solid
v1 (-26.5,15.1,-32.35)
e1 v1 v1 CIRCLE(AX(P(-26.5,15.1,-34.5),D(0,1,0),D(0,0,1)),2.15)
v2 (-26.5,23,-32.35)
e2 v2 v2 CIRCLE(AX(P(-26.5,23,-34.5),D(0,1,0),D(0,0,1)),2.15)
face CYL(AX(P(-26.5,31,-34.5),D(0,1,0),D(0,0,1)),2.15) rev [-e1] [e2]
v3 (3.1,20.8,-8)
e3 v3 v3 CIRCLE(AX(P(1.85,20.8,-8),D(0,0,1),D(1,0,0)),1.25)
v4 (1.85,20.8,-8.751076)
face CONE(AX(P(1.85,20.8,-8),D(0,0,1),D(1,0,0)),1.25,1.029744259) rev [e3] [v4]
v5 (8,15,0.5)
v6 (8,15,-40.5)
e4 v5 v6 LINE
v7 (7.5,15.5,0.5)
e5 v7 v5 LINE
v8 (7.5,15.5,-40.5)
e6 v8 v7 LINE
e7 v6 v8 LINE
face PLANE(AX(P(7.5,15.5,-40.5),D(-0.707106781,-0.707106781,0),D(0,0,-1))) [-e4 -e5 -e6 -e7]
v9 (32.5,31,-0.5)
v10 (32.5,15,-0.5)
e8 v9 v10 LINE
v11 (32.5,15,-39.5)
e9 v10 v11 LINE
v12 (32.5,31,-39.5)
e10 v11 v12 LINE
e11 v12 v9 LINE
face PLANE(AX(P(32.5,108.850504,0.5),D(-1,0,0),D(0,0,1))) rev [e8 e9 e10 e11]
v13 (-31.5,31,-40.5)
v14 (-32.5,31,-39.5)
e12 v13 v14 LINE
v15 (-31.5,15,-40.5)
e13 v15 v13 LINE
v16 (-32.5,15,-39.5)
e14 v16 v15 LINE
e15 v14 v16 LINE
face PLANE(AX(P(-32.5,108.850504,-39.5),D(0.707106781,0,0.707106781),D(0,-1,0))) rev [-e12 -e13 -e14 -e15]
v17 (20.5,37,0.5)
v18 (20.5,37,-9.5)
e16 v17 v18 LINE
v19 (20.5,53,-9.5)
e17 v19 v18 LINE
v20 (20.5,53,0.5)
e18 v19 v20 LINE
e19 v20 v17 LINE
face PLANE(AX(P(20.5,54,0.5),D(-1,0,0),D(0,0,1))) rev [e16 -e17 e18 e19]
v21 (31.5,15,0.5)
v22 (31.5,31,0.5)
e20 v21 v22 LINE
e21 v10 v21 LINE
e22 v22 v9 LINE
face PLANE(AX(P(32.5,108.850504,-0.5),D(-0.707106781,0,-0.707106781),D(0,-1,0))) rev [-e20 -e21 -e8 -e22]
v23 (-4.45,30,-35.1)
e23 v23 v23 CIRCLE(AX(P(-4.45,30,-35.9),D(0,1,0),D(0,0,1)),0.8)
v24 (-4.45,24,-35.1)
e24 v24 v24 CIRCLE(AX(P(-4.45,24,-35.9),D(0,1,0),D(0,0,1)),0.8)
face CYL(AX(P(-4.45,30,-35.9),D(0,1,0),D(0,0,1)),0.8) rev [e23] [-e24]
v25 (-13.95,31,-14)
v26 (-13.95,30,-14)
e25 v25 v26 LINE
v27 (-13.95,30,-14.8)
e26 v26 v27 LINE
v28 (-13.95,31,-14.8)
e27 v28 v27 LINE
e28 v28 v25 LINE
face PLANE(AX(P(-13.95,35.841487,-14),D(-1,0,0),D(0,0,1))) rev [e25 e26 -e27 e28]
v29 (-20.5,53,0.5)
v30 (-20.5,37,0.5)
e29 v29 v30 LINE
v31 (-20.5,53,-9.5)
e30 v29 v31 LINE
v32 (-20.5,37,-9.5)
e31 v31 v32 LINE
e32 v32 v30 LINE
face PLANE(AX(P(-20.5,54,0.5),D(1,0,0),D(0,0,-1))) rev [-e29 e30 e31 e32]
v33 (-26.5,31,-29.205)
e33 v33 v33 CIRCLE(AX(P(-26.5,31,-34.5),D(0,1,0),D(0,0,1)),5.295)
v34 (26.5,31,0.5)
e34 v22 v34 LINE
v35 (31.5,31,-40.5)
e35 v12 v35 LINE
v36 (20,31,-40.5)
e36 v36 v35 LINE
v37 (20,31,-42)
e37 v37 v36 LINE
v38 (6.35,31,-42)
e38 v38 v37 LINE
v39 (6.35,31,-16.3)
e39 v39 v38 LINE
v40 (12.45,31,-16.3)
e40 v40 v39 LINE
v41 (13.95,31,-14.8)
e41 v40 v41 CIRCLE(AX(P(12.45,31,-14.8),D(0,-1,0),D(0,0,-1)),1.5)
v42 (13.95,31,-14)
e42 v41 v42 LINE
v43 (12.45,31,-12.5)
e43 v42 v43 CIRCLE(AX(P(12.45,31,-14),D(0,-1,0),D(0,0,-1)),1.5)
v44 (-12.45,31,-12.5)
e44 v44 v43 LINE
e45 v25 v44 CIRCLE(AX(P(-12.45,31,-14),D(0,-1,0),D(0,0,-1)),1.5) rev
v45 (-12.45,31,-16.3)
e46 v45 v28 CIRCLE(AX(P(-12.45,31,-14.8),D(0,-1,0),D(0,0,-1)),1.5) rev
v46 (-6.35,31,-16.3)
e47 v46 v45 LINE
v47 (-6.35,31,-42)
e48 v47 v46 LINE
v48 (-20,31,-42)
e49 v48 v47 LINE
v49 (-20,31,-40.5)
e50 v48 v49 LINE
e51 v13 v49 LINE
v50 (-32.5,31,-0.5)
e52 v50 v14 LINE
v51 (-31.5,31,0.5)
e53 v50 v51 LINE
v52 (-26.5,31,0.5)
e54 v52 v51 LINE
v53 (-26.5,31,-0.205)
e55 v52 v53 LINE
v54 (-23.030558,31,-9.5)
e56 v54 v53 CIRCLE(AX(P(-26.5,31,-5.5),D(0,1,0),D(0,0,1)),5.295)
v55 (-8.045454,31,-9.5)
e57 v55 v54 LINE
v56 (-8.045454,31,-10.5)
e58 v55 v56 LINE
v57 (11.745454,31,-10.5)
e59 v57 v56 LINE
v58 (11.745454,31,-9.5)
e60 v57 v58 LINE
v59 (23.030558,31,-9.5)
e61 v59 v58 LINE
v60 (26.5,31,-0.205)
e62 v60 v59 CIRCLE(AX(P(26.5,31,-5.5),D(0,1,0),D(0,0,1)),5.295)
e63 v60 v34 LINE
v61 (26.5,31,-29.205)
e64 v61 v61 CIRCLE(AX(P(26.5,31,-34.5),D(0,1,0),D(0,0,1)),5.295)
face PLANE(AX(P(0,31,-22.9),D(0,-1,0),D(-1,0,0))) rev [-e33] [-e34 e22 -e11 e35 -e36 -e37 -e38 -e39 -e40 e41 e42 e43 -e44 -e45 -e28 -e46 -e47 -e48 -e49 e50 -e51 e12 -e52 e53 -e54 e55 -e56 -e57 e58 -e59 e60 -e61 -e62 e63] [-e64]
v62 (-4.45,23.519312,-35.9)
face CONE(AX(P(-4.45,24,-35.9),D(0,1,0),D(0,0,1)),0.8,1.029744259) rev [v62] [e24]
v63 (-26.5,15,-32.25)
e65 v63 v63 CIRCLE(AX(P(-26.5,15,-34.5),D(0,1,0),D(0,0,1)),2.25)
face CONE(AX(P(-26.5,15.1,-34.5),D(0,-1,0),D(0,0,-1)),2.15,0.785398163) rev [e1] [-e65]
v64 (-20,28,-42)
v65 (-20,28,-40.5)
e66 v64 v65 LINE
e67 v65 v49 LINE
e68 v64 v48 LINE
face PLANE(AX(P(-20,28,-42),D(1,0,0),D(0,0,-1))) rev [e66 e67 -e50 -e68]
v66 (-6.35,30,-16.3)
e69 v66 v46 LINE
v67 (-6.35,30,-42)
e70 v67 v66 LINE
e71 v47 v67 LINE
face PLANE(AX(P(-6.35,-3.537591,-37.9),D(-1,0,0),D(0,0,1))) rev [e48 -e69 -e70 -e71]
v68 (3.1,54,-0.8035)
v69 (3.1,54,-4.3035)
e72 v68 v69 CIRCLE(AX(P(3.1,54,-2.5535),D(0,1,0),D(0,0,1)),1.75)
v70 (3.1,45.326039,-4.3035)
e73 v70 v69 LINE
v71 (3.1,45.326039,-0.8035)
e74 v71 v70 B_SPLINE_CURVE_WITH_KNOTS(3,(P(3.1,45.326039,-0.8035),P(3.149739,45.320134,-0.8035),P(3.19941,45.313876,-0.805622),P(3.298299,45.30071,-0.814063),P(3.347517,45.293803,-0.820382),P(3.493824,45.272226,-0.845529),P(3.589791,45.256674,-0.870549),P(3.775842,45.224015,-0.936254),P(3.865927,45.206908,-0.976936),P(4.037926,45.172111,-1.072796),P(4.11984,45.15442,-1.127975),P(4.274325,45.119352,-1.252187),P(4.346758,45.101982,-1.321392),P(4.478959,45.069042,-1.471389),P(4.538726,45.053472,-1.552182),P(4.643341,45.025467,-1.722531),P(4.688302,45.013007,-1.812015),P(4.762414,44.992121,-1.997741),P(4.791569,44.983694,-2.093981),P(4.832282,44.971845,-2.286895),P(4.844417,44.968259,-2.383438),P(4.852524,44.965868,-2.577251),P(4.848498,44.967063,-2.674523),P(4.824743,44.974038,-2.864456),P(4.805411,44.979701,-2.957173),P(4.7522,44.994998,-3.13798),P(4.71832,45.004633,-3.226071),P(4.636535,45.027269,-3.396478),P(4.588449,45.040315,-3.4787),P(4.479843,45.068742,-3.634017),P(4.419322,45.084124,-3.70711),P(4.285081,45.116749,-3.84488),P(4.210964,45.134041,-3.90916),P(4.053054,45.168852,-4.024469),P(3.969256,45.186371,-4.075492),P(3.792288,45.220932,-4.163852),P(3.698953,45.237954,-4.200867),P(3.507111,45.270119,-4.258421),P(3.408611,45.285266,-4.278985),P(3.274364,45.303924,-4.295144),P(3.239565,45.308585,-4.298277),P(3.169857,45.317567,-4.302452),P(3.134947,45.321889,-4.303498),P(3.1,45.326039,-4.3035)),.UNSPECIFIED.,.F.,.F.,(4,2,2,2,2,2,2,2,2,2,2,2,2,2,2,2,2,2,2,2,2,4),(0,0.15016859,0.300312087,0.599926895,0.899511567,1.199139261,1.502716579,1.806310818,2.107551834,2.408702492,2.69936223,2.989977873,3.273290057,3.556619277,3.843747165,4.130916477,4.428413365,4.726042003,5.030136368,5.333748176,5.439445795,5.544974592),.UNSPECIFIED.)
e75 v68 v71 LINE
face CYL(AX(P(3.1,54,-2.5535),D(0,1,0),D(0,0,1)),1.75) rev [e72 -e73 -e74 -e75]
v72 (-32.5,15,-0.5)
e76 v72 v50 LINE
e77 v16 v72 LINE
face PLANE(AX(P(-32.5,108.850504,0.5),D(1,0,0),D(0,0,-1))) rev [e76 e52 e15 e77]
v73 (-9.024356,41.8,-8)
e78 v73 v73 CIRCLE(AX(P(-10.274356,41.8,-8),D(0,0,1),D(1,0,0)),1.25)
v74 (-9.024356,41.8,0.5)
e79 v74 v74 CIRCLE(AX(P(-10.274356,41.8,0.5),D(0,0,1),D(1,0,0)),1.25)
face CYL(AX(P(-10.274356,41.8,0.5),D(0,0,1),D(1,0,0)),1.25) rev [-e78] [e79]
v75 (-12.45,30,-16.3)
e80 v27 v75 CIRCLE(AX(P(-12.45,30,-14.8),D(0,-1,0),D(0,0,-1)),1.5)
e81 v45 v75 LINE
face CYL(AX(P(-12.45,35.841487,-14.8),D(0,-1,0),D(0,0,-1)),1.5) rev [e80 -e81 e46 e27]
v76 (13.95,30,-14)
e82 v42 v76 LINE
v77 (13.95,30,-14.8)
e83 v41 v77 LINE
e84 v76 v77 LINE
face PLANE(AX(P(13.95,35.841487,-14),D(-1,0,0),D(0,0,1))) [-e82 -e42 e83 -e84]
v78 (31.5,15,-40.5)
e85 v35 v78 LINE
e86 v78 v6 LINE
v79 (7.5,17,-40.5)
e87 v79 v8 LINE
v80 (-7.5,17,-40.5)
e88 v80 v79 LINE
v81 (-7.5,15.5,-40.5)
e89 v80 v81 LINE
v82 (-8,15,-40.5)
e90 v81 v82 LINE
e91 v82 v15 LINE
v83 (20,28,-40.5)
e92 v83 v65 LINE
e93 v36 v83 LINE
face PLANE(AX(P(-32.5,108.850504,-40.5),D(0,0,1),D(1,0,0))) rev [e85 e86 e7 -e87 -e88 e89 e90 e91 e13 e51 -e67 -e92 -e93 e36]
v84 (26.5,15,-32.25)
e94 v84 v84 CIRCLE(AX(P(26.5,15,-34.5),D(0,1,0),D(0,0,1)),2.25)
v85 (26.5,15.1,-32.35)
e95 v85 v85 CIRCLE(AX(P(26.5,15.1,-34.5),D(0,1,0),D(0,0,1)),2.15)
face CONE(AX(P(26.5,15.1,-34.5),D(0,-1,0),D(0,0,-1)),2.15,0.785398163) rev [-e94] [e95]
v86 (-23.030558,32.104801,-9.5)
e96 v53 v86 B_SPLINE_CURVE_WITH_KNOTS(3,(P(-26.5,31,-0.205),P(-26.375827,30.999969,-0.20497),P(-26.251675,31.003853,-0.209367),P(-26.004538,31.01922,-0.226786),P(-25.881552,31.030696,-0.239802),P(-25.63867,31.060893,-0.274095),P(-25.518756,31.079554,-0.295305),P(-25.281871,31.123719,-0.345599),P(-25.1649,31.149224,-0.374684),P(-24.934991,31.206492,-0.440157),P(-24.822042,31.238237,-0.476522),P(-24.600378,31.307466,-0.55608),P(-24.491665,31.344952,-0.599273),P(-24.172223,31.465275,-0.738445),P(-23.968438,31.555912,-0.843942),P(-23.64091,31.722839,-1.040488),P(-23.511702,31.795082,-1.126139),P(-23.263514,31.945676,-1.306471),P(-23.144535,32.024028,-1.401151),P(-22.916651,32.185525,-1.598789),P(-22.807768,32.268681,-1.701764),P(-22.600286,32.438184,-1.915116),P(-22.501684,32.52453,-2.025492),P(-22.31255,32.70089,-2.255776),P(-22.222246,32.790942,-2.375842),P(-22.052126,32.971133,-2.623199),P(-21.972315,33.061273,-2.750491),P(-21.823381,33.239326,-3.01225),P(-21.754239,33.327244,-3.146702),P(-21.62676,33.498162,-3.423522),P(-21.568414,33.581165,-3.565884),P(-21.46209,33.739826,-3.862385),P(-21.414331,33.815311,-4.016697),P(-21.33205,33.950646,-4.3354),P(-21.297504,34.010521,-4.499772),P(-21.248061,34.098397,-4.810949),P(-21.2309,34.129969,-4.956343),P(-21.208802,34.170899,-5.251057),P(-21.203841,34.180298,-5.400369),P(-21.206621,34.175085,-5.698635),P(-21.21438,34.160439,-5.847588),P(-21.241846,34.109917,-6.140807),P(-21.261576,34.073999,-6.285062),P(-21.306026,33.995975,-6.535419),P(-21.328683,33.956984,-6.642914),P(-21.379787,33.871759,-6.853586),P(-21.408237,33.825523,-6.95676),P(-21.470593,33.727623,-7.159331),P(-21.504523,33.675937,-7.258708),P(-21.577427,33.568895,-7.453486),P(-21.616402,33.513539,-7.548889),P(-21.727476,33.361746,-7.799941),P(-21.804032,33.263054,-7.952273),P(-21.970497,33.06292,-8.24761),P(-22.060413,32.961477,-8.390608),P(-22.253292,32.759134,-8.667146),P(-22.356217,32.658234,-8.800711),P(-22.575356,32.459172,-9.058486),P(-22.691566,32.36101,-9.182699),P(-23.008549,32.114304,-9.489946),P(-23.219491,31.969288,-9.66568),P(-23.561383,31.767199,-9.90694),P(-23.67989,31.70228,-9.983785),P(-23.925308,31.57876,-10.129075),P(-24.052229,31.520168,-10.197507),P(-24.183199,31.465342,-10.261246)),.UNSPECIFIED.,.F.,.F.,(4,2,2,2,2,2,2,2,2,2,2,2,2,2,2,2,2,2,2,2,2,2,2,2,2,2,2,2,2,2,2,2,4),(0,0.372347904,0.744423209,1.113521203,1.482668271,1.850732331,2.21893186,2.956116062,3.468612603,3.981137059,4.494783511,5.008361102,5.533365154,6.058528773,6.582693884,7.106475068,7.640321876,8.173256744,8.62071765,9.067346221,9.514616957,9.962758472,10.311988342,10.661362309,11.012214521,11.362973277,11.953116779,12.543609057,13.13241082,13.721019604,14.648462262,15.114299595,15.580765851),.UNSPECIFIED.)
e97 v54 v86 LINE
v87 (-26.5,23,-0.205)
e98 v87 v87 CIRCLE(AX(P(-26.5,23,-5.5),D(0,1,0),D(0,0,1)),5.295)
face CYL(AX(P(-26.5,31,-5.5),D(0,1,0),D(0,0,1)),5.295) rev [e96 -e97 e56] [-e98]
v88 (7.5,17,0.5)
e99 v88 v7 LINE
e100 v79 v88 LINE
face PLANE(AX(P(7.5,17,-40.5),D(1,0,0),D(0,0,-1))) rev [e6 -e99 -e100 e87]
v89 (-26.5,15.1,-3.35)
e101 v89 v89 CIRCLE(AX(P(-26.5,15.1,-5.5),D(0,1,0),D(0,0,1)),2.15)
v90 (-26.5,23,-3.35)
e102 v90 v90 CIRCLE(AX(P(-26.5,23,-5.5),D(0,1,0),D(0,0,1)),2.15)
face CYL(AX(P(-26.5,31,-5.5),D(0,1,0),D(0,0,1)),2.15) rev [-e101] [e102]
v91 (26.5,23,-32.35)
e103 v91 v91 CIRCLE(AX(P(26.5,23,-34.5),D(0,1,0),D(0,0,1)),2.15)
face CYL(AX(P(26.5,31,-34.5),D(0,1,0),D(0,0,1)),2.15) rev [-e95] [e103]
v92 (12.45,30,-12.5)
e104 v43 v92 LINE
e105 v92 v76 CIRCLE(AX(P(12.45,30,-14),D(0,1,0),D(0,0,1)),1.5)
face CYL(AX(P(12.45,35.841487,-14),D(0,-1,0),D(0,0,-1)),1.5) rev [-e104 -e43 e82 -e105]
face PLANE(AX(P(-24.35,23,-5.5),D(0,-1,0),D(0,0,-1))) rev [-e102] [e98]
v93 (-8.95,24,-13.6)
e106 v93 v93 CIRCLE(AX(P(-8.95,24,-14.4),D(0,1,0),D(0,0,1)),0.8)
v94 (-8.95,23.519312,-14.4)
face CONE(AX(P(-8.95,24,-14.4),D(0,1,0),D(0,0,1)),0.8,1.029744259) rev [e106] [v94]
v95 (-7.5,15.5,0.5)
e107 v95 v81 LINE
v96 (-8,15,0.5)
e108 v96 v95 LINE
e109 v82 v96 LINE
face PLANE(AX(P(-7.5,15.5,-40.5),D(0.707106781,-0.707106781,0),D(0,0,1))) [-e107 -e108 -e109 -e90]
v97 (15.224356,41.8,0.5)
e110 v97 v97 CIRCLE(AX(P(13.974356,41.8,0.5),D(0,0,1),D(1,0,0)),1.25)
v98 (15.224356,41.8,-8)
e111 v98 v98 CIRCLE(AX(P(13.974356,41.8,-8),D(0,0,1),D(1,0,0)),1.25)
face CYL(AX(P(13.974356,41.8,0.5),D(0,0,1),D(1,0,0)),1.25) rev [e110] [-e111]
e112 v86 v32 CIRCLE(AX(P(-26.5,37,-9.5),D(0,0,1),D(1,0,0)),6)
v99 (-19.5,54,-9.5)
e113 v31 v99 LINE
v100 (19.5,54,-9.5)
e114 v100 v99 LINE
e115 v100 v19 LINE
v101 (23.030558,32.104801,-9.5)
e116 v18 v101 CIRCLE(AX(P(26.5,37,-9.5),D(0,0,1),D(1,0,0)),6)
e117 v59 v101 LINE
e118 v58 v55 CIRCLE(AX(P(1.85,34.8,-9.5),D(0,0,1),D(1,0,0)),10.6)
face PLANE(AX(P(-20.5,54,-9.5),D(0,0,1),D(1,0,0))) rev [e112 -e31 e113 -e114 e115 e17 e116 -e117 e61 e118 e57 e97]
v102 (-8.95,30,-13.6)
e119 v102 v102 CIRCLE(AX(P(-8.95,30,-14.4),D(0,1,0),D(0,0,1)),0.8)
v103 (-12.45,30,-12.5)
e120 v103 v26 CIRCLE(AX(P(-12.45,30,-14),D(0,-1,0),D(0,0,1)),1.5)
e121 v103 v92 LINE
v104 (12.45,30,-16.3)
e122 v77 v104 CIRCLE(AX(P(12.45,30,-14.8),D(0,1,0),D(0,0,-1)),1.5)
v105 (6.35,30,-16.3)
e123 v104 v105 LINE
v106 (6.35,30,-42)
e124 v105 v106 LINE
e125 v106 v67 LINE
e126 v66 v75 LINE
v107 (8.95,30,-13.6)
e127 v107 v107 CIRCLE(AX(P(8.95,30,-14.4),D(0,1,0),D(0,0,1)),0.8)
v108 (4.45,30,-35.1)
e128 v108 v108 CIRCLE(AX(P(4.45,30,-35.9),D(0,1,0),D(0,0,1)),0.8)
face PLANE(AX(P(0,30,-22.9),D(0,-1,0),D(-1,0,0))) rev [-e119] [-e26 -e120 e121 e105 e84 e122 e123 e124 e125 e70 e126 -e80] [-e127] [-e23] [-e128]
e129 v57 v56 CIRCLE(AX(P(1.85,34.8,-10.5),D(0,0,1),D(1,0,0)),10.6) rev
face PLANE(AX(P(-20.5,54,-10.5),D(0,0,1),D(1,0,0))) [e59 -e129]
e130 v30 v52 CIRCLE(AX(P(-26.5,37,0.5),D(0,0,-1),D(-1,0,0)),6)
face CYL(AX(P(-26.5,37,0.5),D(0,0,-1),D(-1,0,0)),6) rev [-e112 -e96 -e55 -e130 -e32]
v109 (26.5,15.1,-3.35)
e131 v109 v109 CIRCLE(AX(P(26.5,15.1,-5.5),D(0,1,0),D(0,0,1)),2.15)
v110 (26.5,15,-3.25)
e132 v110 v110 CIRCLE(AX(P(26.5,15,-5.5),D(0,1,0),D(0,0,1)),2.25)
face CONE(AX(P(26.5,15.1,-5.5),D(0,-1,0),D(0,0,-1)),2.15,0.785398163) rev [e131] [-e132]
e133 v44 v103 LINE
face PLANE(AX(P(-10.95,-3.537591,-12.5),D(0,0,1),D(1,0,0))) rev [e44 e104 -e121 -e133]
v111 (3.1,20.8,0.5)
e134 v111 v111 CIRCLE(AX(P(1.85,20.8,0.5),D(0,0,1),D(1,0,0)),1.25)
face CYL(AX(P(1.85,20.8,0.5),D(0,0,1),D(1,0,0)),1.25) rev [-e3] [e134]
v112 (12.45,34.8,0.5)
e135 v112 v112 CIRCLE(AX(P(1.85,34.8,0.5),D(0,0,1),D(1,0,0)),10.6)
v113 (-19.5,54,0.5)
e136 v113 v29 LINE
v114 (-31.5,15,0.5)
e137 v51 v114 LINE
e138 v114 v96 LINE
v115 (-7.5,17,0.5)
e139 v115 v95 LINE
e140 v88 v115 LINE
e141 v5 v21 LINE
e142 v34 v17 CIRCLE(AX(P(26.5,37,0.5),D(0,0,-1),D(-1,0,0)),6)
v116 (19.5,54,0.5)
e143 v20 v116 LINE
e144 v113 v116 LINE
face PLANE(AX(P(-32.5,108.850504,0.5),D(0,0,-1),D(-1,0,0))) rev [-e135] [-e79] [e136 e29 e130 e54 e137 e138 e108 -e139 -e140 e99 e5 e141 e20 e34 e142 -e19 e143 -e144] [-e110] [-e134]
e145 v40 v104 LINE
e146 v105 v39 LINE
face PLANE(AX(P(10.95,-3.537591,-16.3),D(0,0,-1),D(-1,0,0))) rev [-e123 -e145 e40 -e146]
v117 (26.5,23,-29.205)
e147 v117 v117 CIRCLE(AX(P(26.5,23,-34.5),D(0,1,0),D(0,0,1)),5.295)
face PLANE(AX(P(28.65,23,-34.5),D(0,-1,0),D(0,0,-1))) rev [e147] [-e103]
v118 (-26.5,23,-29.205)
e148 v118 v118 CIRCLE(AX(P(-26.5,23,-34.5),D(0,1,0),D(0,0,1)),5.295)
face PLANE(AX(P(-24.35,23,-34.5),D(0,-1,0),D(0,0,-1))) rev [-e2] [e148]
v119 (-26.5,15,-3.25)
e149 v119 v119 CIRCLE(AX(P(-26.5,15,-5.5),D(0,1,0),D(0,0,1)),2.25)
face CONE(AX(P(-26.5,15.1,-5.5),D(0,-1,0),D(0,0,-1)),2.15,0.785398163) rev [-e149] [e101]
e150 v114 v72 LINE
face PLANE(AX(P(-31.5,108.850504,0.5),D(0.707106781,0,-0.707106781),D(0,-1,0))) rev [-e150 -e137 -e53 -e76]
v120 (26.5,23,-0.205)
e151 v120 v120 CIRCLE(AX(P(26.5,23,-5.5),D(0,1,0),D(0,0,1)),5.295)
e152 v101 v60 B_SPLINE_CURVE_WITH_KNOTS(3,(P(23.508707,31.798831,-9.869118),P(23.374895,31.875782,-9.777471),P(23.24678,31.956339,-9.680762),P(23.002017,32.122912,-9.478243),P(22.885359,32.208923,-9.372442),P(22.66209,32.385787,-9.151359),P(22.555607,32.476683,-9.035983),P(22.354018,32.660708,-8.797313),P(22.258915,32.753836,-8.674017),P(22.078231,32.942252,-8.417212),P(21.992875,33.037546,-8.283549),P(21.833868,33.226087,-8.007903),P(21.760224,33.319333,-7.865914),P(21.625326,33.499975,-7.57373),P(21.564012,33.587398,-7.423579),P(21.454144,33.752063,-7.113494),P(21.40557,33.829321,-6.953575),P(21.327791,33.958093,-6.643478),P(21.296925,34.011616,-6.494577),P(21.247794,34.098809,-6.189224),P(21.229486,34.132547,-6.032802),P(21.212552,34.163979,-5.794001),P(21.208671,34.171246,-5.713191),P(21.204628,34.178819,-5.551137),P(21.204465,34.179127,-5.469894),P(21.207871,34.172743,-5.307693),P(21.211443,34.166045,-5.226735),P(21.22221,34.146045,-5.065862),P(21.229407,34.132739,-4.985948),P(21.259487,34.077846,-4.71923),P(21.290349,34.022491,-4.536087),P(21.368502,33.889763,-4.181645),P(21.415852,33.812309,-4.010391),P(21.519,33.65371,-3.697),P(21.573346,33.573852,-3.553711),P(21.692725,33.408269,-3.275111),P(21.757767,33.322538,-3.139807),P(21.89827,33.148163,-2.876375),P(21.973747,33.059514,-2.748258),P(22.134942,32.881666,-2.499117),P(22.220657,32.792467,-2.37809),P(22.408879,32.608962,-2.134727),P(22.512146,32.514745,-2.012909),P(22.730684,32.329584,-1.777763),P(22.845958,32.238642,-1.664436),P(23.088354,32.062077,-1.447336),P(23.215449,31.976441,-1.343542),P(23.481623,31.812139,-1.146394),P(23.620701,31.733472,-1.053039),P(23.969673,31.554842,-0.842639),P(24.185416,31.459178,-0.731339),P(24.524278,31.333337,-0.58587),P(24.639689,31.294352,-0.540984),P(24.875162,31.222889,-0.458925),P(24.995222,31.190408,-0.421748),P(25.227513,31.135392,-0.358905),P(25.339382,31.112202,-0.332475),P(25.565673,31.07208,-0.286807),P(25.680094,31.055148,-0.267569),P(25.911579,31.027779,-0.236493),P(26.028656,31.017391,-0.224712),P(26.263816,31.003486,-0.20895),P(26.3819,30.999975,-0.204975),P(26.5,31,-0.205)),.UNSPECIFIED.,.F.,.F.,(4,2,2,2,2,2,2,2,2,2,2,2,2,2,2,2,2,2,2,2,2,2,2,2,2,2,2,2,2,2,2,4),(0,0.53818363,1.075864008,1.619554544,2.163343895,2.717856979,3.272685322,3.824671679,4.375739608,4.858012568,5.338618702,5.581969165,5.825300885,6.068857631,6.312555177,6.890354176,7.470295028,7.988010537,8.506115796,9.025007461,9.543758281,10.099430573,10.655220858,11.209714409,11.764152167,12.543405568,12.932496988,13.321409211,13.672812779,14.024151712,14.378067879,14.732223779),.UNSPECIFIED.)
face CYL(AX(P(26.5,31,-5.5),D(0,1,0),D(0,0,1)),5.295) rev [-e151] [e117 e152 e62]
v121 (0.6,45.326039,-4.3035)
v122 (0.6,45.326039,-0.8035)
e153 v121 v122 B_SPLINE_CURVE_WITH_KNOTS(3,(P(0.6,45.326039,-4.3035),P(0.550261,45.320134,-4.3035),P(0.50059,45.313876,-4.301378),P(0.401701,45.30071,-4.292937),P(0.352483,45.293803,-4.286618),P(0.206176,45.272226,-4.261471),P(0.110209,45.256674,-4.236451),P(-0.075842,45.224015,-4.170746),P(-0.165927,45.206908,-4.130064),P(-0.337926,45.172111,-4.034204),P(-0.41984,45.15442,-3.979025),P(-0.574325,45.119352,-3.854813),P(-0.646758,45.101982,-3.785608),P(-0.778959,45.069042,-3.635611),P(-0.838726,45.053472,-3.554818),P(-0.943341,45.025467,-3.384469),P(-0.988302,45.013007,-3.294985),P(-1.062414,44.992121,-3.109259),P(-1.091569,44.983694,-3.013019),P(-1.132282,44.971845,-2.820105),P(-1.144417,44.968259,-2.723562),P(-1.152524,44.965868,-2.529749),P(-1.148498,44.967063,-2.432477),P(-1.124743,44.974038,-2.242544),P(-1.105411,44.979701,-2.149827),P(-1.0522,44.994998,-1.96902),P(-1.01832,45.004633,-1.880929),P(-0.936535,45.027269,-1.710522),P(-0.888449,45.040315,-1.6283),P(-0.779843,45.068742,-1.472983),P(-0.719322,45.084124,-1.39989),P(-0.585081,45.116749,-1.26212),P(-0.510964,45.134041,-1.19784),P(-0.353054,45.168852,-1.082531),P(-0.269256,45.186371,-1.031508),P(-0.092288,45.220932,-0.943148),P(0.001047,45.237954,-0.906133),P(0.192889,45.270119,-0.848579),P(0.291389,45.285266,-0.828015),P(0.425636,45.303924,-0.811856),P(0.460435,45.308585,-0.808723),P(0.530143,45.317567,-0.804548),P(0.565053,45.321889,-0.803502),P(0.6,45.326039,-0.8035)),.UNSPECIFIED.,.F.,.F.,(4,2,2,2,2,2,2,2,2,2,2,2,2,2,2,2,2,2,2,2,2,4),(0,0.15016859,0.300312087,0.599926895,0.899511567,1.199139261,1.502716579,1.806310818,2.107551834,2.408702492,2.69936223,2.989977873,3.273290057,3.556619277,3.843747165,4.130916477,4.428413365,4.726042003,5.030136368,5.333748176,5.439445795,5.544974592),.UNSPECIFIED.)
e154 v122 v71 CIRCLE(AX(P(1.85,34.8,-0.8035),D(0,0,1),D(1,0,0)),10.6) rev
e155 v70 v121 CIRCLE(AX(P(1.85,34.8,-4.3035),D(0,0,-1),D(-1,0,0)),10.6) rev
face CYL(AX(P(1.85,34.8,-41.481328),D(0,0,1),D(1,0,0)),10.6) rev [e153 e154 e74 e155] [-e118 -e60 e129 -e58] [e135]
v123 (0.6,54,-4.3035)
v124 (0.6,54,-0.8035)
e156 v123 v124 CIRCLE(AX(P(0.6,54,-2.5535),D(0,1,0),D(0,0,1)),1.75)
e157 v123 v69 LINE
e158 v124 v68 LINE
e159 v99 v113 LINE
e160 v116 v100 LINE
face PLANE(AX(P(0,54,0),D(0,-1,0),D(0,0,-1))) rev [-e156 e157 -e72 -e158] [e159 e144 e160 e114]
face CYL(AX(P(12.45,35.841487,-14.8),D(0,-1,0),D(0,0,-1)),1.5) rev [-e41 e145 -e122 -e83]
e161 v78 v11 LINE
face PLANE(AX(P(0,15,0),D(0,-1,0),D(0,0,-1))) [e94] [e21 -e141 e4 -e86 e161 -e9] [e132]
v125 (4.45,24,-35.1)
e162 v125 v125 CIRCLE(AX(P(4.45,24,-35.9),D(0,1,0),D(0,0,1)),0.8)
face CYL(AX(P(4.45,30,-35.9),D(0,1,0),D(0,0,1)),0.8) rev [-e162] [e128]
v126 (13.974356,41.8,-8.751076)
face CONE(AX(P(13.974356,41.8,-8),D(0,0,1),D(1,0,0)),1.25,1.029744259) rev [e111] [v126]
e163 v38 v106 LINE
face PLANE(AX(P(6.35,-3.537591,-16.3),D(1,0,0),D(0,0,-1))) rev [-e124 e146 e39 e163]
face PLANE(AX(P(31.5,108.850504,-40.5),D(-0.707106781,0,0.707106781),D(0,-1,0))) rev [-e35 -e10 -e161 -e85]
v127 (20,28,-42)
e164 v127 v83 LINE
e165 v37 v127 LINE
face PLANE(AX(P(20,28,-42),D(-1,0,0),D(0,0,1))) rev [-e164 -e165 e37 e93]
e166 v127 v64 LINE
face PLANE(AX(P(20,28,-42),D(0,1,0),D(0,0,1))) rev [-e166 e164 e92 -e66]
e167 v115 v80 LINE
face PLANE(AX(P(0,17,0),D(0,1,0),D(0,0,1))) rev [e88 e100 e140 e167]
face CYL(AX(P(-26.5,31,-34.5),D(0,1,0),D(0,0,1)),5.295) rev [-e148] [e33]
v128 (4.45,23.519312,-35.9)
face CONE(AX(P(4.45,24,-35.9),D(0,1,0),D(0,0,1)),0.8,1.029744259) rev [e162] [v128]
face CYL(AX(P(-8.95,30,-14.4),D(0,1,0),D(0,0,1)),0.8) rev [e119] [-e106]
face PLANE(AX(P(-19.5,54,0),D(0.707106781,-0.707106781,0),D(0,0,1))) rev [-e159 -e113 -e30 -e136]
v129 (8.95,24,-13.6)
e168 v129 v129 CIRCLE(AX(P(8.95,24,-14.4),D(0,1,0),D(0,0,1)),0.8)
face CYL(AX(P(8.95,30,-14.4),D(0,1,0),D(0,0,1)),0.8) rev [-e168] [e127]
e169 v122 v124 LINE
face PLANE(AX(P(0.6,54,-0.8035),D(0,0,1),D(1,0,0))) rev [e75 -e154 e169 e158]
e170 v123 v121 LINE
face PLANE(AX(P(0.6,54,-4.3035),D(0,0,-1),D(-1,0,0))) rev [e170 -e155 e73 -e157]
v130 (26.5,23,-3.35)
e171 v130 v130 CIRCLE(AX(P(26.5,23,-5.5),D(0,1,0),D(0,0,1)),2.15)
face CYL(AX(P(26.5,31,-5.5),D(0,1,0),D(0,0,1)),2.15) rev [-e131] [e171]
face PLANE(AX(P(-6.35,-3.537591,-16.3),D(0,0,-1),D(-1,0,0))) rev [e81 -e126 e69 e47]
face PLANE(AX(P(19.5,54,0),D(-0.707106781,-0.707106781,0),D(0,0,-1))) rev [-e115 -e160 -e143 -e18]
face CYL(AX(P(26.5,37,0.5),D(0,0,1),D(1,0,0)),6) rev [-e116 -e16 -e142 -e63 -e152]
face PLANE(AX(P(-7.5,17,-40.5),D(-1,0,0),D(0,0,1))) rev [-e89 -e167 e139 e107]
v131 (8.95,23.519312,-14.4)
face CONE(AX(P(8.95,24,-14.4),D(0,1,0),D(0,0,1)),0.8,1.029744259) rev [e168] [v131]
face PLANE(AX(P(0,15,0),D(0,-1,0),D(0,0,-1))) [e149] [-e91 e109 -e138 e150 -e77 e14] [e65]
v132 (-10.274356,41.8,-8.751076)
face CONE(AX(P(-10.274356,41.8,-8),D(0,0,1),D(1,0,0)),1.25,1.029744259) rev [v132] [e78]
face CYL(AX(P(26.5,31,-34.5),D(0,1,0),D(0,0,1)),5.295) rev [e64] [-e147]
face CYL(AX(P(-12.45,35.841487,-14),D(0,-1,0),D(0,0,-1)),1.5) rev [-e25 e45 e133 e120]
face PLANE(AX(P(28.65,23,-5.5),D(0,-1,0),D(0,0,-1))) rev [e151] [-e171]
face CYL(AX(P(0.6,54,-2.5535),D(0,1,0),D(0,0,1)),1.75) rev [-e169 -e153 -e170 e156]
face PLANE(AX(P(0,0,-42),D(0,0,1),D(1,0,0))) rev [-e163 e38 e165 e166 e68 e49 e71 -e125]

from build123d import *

# Parameters (mm, degrees)
SKETCH1_W                                     = 65
SKETCH1_H                                     = 41
BOSS_EXTRUDE1_DEPTH                           = 16
SKETCH15_W                                    = 41
SKETCH15_H                                    = 10
BOSS_EXTRUDE4_DEPTH                           = 23
SKETCH4_R                                     = 10.6
CUT_EXTRUDE3_DEPTH                            = 11
M3_TAPPED_HOLE1_D                             = 2.5
M3_TAPPED_HOLE1_DEPTH                         = 8.5
M3_TAPPED_HOLE1_TIP                           = 0.751075774
CUT_EXTRUDE4_START                            = -1
CUT_EXTRUDE4_DEPTH                            = 1
SKETCH30_W                                    = 40
SKETCH30_H                                    = 3
BOSS_EXTRUDE5_DEPTH                           = 1.5
SKETCH27_W                                    = 12.7
SKETCH27_H                                    = 4.1
CUT_EXTRUDE6_DEPTH                            = 1
CUT_EXTRUDE7_DEPTH                            = 1
M2_TAPPED_HOLE1_D                             = 1.6
M2_TAPPED_HOLE1_DEPTH                         = 6
M2_TAPPED_HOLE1_TIP                           = 0.480688495
CBORE_FOR_M4_HEX_HEAD_MACHINE_SCREW1_AT_COUNT = 2
CBORE_FOR_M4_HEX_HEAD_MACHINE_SCREW1_AT_PITCH = 53
CBORE_FOR_M4_HEX_HEAD_MACHINE_SCREW1_2_COUNT  = 2
CBORE_FOR_M4_HEX_HEAD_MACHINE_SCREW1_2_PITCH  = 60.415229868
CBORE_FOR_M4_HEX_HEAD_MACHINE_SCREW1_3_COUNT  = 2
CBORE_FOR_M4_HEX_HEAD_MACHINE_SCREW1_3_PITCH  = 29
CHAMFER4_SIZE                                 = 1
F_3_5_START                                   = 44
F_3_5_3_5_DIAMETER_SLOT1_DEPTH                = 10
FILLET1_R                                     = 6
SKETCH33_W                                    = 15
SKETCH33_H                                    = 41
CUT_EXTRUDE8_DEPTH                            = 2
CHAMFER5_SIZE                                 = 0.5


with BuildPart() as part:
    # Sketch1 → Boss-Extrude1 (new body)
    with BuildSketch(Plane(origin=(0, 15, 0), x_dir=(1, 0, 0), z_dir=(0, 1, 0))):
        with Locations((0, 20)):
            Rectangle(SKETCH1_W, SKETCH1_H)
    extrude(amount=BOSS_EXTRUDE1_DEPTH)

    # Sketch15 → Boss-Extrude4 (add)
    with BuildSketch(Plane(origin=(0, 31, 0), x_dir=(1, 0, 0), z_dir=(0, 1, 0))):
        with Locations((0, 4.5)):
            Rectangle(SKETCH15_W, SKETCH15_H)
    extrude(amount=BOSS_EXTRUDE4_DEPTH)

    # Sketch4 → Cut-Extrude3 (cut)
    with BuildSketch(Plane.XY.offset(0.5)):
        with Locations((1.85, 34.8)):
            Circle(SKETCH4_R)
    extrude(amount=-CUT_EXTRUDE3_DEPTH, mode=Mode.SUBTRACT)

    # M3 Tapped Hole1
    with Locations(Plane.XY.offset(0.5)):
        with Locations((13.974355653, 41.8), (1.85, 20.8), (-10.274355653, 41.8)):
            Hole(M3_TAPPED_HOLE1_D / 2, depth=M3_TAPPED_HOLE1_DEPTH)
            with Locations((0, 0, -(M3_TAPPED_HOLE1_DEPTH + M3_TAPPED_HOLE1_TIP / 2))):  # 118° drill point
                Cone(0, M3_TAPPED_HOLE1_D / 2, M3_TAPPED_HOLE1_TIP, mode=Mode.SUBTRACT)

    # Sketch16 → Cut-Extrude4 (cut)
    with BuildSketch(Plane(origin=(0, 31, 0), x_dir=(1, 0, 0), z_dir=(0, 1, 0)).offset(CUT_EXTRUDE4_START)):
        Polygon((-10.95, 12.5), (10.95, 12.5), (10.95, 16.3), (6.35, 16.3), (6.35, 37.9), (-6.35, 37.9), (-6.35, 16.3), (-10.95, 16.3), align=None)
    extrude(amount=CUT_EXTRUDE4_DEPTH, mode=Mode.SUBTRACT)

    # Sketch30 → Boss-Extrude5 (add)
    with BuildSketch(Plane(origin=(0, 0, -40.5), x_dir=(-1, 0, 0), z_dir=(0, 0, -1))):
        with Locations((0, 29.5)):
            Rectangle(SKETCH30_W, SKETCH30_H)
    extrude(amount=BOSS_EXTRUDE5_DEPTH)

    # Sketch27 → Cut-Extrude6 (cut)
    with BuildSketch(Plane(origin=(0, 30, 0), x_dir=(1, 0, 0), z_dir=(0, 1, 0))):
        with Locations((0, 39.95)):
            Rectangle(SKETCH27_W, SKETCH27_H)
    extrude(amount=CUT_EXTRUDE6_DEPTH, mode=Mode.SUBTRACT)

    # Sketch28 → Cut-Extrude7 (cut)
    with BuildSketch(Plane(origin=(0, 30, 0), x_dir=(1, 0, 0), z_dir=(0, 1, 0))):
        with BuildLine():
            Line((10.95, 12.5), (12.45, 12.5))
            ThreePointArc((12.45, 12.5), (13.510660172, 12.939339828), (13.95, 14))
            Line((13.95, 14), (13.95, 14.8))
            ThreePointArc((13.95, 14.8), (13.510660172, 15.860660172), (12.45, 16.3))
            Line((12.45, 16.3), (10.95, 16.3))
            Line((10.95, 16.3), (10.95, 12.5))
        make_face()
    cut_extrude7 = extrude(amount=CUT_EXTRUDE7_DEPTH, mode=Mode.SUBTRACT)

    # Mirror1: Cut-Extrude7 across plane
    add(cut_extrude7.mirror(Plane(origin=(0, 0, 0), x_dir=(0, 0, 1), z_dir=(1, 0, 0))), mode=Mode.SUBTRACT)

    # M2 Tapped Hole1
    with Locations(Plane(origin=(0, 30, 0), x_dir=(1, 0, 0), z_dir=(0, 1, 0))):
        with Locations((-4.45, 35.9), (4.45, 35.9), (8.95, 14.4), (-8.95, 14.4)):
            Hole(M2_TAPPED_HOLE1_D / 2, depth=M2_TAPPED_HOLE1_DEPTH)
            with Locations((0, 0, -(M2_TAPPED_HOLE1_DEPTH + M2_TAPPED_HOLE1_TIP / 2))):  # 118° drill point
                Cone(0, M2_TAPPED_HOLE1_D / 2, M2_TAPPED_HOLE1_TIP, mode=Mode.SUBTRACT)

    # Sketch21 → CBORE for M4 Hex Head Machine Screw1 (revolve, cut)
    with BuildSketch(Plane(origin=(26.5, 31, -34.5), x_dir=(0, 0, 1), z_dir=(1, 0, 0))):
        Polygon((0, 0), (0, 16), (2.25, 16), (2.15, 15.9), (2.15, 8), (5.295, 8), (5.295, 0), align=None)
    cbore_for_m4_hex_head_machine_screw1 = revolve(axis=Axis((26.5, 37.35, -34.5), (0, -1, 0)), mode=Mode.SUBTRACT)

    # CBORE for M4 Hex Head Machine Screw1 at: CBORE for M4 Hex Head Machine Screw1 ×2
    with Locations(*[(-i * CBORE_FOR_M4_HEX_HEAD_MACHINE_SCREW1_AT_PITCH, 0, 0) for i in range(1, CBORE_FOR_M4_HEX_HEAD_MACHINE_SCREW1_AT_COUNT)]):
        add(cbore_for_m4_hex_head_machine_screw1, mode=Mode.SUBTRACT)

    # CBORE for M4 Hex Head Machine Screw1 2: CBORE for M4 Hex Head Machine Screw1 ×2
    with Locations(*[Vector(-0.8772622419185101, 0, 0.4800114153893735) * (i * CBORE_FOR_M4_HEX_HEAD_MACHINE_SCREW1_2_PITCH) for i in range(1, CBORE_FOR_M4_HEX_HEAD_MACHINE_SCREW1_2_COUNT)]):
        add(cbore_for_m4_hex_head_machine_screw1, mode=Mode.SUBTRACT)

    # CBORE for M4 Hex Head Machine Screw1 3: CBORE for M4 Hex Head Machine Screw1 ×2
    with Locations(*[(0, 0, i * CBORE_FOR_M4_HEX_HEAD_MACHINE_SCREW1_3_PITCH) for i in range(1, CBORE_FOR_M4_HEX_HEAD_MACHINE_SCREW1_3_COUNT)]):
        add(cbore_for_m4_hex_head_machine_screw1, mode=Mode.SUBTRACT)

    # Chamfer4
    chamfer4_edges = [part.edges().sort_by_distance(p)[0] for p in [
        (-20.5, 54, -4.5),
        (20.5, 54, -4.5),
        (32.5, 23, 0.5),
        (-32.5, 23, 0.5),
        (32.5, 23, -40.5),
        (-32.5, 23, -40.5),
    ]]
    chamfer(chamfer4_edges, length=CHAMFER4_SIZE)

    # Ø3.5 (3.5) Diameter Slot1: read off the stored shape, not the designer's step
    # Ø3.5 (3.5) Diameter Slot1 outline → Ø3.5 (3.5) Diameter Slot1 (cut)
    with BuildSketch(Plane(origin=(0, 0, 0), x_dir=(1, 0, 0), z_dir=(0, 1, 0)).offset(F_3_5_START)):
        with BuildLine():
            Line((0.6, 0.8035), (3.1, 0.8035))
            ThreePointArc((3.1, 0.8035), (4.85, 2.5535), (3.1, 4.3035))
            Line((3.1, 4.3035), (0.6, 4.3035))
            ThreePointArc((0.6, 4.3035), (-1.15, 2.5535), (0.6, 0.8035))
        make_face()
    extrude(amount=F_3_5_3_5_DIAMETER_SLOT1_DEPTH, mode=Mode.SUBTRACT)

    # Fillet1
    # the kernel refuses this fillet: 6 mm, written as the material it adds along each edge
    with BuildSketch(Plane(origin=(20.5, 31, 0.5), x_dir=(1, 0, 0), z_dir=(0, 0, -1))) as fillet1_piece_1_section:
        with BuildLine():
            CenterArc((FILLET1_R, -FILLET1_R), FILLET1_R, 90, 90)
            Line((0, -FILLET1_R), (0, 0))
            Line((0, 0), (FILLET1_R, 0))
        make_face()
    fillet1_piece_1 = extrude(amount=10, mode=Mode.PRIVATE)
    fillet1_piece_1 = fillet1_piece_1 - Plane(origin=(26.5, 31, -5.5), x_dir=(0, 0, 1), z_dir=(0, 1, 0)) * Cylinder(5.295, 45, mode=Mode.PRIVATE)
    add(fillet1_piece_1)
    with BuildSketch(Plane(origin=(-20.5, 31, -9.5), x_dir=(-1, 0, 0), z_dir=(0, 0, 1))) as fillet1_piece_2_section:
        with BuildLine():
            CenterArc((FILLET1_R, -FILLET1_R), FILLET1_R, 90, 90)
            Line((0, -FILLET1_R), (0, 0))
            Line((0, 0), (FILLET1_R, 0))
        make_face()
    fillet1_piece_2 = extrude(amount=10, mode=Mode.PRIVATE)
    fillet1_piece_2 = fillet1_piece_2 - Plane(origin=(-26.5, 31, -5.5), x_dir=(0, 0, 1), z_dir=(0, 1, 0)) * Cylinder(5.295, 45, mode=Mode.PRIVATE)
    add(fillet1_piece_2)

    # Sketch33 → Cut-Extrude8 (cut)
    with BuildSketch(Plane.XZ.offset(-15)):
        with Locations((0, -20)):
            Rectangle(SKETCH33_W, SKETCH33_H)
    extrude(amount=-CUT_EXTRUDE8_DEPTH, mode=Mode.SUBTRACT)

    # Chamfer5
    chamfer5_edges = [part.edges().sort_by_distance(p)[0] for p in [
        (7.5, 15, -20),
        (-7.5, 15, -20),
    ]]
    chamfer(chamfer5_edges, length=CHAMFER5_SIZE)


solid = part.part
